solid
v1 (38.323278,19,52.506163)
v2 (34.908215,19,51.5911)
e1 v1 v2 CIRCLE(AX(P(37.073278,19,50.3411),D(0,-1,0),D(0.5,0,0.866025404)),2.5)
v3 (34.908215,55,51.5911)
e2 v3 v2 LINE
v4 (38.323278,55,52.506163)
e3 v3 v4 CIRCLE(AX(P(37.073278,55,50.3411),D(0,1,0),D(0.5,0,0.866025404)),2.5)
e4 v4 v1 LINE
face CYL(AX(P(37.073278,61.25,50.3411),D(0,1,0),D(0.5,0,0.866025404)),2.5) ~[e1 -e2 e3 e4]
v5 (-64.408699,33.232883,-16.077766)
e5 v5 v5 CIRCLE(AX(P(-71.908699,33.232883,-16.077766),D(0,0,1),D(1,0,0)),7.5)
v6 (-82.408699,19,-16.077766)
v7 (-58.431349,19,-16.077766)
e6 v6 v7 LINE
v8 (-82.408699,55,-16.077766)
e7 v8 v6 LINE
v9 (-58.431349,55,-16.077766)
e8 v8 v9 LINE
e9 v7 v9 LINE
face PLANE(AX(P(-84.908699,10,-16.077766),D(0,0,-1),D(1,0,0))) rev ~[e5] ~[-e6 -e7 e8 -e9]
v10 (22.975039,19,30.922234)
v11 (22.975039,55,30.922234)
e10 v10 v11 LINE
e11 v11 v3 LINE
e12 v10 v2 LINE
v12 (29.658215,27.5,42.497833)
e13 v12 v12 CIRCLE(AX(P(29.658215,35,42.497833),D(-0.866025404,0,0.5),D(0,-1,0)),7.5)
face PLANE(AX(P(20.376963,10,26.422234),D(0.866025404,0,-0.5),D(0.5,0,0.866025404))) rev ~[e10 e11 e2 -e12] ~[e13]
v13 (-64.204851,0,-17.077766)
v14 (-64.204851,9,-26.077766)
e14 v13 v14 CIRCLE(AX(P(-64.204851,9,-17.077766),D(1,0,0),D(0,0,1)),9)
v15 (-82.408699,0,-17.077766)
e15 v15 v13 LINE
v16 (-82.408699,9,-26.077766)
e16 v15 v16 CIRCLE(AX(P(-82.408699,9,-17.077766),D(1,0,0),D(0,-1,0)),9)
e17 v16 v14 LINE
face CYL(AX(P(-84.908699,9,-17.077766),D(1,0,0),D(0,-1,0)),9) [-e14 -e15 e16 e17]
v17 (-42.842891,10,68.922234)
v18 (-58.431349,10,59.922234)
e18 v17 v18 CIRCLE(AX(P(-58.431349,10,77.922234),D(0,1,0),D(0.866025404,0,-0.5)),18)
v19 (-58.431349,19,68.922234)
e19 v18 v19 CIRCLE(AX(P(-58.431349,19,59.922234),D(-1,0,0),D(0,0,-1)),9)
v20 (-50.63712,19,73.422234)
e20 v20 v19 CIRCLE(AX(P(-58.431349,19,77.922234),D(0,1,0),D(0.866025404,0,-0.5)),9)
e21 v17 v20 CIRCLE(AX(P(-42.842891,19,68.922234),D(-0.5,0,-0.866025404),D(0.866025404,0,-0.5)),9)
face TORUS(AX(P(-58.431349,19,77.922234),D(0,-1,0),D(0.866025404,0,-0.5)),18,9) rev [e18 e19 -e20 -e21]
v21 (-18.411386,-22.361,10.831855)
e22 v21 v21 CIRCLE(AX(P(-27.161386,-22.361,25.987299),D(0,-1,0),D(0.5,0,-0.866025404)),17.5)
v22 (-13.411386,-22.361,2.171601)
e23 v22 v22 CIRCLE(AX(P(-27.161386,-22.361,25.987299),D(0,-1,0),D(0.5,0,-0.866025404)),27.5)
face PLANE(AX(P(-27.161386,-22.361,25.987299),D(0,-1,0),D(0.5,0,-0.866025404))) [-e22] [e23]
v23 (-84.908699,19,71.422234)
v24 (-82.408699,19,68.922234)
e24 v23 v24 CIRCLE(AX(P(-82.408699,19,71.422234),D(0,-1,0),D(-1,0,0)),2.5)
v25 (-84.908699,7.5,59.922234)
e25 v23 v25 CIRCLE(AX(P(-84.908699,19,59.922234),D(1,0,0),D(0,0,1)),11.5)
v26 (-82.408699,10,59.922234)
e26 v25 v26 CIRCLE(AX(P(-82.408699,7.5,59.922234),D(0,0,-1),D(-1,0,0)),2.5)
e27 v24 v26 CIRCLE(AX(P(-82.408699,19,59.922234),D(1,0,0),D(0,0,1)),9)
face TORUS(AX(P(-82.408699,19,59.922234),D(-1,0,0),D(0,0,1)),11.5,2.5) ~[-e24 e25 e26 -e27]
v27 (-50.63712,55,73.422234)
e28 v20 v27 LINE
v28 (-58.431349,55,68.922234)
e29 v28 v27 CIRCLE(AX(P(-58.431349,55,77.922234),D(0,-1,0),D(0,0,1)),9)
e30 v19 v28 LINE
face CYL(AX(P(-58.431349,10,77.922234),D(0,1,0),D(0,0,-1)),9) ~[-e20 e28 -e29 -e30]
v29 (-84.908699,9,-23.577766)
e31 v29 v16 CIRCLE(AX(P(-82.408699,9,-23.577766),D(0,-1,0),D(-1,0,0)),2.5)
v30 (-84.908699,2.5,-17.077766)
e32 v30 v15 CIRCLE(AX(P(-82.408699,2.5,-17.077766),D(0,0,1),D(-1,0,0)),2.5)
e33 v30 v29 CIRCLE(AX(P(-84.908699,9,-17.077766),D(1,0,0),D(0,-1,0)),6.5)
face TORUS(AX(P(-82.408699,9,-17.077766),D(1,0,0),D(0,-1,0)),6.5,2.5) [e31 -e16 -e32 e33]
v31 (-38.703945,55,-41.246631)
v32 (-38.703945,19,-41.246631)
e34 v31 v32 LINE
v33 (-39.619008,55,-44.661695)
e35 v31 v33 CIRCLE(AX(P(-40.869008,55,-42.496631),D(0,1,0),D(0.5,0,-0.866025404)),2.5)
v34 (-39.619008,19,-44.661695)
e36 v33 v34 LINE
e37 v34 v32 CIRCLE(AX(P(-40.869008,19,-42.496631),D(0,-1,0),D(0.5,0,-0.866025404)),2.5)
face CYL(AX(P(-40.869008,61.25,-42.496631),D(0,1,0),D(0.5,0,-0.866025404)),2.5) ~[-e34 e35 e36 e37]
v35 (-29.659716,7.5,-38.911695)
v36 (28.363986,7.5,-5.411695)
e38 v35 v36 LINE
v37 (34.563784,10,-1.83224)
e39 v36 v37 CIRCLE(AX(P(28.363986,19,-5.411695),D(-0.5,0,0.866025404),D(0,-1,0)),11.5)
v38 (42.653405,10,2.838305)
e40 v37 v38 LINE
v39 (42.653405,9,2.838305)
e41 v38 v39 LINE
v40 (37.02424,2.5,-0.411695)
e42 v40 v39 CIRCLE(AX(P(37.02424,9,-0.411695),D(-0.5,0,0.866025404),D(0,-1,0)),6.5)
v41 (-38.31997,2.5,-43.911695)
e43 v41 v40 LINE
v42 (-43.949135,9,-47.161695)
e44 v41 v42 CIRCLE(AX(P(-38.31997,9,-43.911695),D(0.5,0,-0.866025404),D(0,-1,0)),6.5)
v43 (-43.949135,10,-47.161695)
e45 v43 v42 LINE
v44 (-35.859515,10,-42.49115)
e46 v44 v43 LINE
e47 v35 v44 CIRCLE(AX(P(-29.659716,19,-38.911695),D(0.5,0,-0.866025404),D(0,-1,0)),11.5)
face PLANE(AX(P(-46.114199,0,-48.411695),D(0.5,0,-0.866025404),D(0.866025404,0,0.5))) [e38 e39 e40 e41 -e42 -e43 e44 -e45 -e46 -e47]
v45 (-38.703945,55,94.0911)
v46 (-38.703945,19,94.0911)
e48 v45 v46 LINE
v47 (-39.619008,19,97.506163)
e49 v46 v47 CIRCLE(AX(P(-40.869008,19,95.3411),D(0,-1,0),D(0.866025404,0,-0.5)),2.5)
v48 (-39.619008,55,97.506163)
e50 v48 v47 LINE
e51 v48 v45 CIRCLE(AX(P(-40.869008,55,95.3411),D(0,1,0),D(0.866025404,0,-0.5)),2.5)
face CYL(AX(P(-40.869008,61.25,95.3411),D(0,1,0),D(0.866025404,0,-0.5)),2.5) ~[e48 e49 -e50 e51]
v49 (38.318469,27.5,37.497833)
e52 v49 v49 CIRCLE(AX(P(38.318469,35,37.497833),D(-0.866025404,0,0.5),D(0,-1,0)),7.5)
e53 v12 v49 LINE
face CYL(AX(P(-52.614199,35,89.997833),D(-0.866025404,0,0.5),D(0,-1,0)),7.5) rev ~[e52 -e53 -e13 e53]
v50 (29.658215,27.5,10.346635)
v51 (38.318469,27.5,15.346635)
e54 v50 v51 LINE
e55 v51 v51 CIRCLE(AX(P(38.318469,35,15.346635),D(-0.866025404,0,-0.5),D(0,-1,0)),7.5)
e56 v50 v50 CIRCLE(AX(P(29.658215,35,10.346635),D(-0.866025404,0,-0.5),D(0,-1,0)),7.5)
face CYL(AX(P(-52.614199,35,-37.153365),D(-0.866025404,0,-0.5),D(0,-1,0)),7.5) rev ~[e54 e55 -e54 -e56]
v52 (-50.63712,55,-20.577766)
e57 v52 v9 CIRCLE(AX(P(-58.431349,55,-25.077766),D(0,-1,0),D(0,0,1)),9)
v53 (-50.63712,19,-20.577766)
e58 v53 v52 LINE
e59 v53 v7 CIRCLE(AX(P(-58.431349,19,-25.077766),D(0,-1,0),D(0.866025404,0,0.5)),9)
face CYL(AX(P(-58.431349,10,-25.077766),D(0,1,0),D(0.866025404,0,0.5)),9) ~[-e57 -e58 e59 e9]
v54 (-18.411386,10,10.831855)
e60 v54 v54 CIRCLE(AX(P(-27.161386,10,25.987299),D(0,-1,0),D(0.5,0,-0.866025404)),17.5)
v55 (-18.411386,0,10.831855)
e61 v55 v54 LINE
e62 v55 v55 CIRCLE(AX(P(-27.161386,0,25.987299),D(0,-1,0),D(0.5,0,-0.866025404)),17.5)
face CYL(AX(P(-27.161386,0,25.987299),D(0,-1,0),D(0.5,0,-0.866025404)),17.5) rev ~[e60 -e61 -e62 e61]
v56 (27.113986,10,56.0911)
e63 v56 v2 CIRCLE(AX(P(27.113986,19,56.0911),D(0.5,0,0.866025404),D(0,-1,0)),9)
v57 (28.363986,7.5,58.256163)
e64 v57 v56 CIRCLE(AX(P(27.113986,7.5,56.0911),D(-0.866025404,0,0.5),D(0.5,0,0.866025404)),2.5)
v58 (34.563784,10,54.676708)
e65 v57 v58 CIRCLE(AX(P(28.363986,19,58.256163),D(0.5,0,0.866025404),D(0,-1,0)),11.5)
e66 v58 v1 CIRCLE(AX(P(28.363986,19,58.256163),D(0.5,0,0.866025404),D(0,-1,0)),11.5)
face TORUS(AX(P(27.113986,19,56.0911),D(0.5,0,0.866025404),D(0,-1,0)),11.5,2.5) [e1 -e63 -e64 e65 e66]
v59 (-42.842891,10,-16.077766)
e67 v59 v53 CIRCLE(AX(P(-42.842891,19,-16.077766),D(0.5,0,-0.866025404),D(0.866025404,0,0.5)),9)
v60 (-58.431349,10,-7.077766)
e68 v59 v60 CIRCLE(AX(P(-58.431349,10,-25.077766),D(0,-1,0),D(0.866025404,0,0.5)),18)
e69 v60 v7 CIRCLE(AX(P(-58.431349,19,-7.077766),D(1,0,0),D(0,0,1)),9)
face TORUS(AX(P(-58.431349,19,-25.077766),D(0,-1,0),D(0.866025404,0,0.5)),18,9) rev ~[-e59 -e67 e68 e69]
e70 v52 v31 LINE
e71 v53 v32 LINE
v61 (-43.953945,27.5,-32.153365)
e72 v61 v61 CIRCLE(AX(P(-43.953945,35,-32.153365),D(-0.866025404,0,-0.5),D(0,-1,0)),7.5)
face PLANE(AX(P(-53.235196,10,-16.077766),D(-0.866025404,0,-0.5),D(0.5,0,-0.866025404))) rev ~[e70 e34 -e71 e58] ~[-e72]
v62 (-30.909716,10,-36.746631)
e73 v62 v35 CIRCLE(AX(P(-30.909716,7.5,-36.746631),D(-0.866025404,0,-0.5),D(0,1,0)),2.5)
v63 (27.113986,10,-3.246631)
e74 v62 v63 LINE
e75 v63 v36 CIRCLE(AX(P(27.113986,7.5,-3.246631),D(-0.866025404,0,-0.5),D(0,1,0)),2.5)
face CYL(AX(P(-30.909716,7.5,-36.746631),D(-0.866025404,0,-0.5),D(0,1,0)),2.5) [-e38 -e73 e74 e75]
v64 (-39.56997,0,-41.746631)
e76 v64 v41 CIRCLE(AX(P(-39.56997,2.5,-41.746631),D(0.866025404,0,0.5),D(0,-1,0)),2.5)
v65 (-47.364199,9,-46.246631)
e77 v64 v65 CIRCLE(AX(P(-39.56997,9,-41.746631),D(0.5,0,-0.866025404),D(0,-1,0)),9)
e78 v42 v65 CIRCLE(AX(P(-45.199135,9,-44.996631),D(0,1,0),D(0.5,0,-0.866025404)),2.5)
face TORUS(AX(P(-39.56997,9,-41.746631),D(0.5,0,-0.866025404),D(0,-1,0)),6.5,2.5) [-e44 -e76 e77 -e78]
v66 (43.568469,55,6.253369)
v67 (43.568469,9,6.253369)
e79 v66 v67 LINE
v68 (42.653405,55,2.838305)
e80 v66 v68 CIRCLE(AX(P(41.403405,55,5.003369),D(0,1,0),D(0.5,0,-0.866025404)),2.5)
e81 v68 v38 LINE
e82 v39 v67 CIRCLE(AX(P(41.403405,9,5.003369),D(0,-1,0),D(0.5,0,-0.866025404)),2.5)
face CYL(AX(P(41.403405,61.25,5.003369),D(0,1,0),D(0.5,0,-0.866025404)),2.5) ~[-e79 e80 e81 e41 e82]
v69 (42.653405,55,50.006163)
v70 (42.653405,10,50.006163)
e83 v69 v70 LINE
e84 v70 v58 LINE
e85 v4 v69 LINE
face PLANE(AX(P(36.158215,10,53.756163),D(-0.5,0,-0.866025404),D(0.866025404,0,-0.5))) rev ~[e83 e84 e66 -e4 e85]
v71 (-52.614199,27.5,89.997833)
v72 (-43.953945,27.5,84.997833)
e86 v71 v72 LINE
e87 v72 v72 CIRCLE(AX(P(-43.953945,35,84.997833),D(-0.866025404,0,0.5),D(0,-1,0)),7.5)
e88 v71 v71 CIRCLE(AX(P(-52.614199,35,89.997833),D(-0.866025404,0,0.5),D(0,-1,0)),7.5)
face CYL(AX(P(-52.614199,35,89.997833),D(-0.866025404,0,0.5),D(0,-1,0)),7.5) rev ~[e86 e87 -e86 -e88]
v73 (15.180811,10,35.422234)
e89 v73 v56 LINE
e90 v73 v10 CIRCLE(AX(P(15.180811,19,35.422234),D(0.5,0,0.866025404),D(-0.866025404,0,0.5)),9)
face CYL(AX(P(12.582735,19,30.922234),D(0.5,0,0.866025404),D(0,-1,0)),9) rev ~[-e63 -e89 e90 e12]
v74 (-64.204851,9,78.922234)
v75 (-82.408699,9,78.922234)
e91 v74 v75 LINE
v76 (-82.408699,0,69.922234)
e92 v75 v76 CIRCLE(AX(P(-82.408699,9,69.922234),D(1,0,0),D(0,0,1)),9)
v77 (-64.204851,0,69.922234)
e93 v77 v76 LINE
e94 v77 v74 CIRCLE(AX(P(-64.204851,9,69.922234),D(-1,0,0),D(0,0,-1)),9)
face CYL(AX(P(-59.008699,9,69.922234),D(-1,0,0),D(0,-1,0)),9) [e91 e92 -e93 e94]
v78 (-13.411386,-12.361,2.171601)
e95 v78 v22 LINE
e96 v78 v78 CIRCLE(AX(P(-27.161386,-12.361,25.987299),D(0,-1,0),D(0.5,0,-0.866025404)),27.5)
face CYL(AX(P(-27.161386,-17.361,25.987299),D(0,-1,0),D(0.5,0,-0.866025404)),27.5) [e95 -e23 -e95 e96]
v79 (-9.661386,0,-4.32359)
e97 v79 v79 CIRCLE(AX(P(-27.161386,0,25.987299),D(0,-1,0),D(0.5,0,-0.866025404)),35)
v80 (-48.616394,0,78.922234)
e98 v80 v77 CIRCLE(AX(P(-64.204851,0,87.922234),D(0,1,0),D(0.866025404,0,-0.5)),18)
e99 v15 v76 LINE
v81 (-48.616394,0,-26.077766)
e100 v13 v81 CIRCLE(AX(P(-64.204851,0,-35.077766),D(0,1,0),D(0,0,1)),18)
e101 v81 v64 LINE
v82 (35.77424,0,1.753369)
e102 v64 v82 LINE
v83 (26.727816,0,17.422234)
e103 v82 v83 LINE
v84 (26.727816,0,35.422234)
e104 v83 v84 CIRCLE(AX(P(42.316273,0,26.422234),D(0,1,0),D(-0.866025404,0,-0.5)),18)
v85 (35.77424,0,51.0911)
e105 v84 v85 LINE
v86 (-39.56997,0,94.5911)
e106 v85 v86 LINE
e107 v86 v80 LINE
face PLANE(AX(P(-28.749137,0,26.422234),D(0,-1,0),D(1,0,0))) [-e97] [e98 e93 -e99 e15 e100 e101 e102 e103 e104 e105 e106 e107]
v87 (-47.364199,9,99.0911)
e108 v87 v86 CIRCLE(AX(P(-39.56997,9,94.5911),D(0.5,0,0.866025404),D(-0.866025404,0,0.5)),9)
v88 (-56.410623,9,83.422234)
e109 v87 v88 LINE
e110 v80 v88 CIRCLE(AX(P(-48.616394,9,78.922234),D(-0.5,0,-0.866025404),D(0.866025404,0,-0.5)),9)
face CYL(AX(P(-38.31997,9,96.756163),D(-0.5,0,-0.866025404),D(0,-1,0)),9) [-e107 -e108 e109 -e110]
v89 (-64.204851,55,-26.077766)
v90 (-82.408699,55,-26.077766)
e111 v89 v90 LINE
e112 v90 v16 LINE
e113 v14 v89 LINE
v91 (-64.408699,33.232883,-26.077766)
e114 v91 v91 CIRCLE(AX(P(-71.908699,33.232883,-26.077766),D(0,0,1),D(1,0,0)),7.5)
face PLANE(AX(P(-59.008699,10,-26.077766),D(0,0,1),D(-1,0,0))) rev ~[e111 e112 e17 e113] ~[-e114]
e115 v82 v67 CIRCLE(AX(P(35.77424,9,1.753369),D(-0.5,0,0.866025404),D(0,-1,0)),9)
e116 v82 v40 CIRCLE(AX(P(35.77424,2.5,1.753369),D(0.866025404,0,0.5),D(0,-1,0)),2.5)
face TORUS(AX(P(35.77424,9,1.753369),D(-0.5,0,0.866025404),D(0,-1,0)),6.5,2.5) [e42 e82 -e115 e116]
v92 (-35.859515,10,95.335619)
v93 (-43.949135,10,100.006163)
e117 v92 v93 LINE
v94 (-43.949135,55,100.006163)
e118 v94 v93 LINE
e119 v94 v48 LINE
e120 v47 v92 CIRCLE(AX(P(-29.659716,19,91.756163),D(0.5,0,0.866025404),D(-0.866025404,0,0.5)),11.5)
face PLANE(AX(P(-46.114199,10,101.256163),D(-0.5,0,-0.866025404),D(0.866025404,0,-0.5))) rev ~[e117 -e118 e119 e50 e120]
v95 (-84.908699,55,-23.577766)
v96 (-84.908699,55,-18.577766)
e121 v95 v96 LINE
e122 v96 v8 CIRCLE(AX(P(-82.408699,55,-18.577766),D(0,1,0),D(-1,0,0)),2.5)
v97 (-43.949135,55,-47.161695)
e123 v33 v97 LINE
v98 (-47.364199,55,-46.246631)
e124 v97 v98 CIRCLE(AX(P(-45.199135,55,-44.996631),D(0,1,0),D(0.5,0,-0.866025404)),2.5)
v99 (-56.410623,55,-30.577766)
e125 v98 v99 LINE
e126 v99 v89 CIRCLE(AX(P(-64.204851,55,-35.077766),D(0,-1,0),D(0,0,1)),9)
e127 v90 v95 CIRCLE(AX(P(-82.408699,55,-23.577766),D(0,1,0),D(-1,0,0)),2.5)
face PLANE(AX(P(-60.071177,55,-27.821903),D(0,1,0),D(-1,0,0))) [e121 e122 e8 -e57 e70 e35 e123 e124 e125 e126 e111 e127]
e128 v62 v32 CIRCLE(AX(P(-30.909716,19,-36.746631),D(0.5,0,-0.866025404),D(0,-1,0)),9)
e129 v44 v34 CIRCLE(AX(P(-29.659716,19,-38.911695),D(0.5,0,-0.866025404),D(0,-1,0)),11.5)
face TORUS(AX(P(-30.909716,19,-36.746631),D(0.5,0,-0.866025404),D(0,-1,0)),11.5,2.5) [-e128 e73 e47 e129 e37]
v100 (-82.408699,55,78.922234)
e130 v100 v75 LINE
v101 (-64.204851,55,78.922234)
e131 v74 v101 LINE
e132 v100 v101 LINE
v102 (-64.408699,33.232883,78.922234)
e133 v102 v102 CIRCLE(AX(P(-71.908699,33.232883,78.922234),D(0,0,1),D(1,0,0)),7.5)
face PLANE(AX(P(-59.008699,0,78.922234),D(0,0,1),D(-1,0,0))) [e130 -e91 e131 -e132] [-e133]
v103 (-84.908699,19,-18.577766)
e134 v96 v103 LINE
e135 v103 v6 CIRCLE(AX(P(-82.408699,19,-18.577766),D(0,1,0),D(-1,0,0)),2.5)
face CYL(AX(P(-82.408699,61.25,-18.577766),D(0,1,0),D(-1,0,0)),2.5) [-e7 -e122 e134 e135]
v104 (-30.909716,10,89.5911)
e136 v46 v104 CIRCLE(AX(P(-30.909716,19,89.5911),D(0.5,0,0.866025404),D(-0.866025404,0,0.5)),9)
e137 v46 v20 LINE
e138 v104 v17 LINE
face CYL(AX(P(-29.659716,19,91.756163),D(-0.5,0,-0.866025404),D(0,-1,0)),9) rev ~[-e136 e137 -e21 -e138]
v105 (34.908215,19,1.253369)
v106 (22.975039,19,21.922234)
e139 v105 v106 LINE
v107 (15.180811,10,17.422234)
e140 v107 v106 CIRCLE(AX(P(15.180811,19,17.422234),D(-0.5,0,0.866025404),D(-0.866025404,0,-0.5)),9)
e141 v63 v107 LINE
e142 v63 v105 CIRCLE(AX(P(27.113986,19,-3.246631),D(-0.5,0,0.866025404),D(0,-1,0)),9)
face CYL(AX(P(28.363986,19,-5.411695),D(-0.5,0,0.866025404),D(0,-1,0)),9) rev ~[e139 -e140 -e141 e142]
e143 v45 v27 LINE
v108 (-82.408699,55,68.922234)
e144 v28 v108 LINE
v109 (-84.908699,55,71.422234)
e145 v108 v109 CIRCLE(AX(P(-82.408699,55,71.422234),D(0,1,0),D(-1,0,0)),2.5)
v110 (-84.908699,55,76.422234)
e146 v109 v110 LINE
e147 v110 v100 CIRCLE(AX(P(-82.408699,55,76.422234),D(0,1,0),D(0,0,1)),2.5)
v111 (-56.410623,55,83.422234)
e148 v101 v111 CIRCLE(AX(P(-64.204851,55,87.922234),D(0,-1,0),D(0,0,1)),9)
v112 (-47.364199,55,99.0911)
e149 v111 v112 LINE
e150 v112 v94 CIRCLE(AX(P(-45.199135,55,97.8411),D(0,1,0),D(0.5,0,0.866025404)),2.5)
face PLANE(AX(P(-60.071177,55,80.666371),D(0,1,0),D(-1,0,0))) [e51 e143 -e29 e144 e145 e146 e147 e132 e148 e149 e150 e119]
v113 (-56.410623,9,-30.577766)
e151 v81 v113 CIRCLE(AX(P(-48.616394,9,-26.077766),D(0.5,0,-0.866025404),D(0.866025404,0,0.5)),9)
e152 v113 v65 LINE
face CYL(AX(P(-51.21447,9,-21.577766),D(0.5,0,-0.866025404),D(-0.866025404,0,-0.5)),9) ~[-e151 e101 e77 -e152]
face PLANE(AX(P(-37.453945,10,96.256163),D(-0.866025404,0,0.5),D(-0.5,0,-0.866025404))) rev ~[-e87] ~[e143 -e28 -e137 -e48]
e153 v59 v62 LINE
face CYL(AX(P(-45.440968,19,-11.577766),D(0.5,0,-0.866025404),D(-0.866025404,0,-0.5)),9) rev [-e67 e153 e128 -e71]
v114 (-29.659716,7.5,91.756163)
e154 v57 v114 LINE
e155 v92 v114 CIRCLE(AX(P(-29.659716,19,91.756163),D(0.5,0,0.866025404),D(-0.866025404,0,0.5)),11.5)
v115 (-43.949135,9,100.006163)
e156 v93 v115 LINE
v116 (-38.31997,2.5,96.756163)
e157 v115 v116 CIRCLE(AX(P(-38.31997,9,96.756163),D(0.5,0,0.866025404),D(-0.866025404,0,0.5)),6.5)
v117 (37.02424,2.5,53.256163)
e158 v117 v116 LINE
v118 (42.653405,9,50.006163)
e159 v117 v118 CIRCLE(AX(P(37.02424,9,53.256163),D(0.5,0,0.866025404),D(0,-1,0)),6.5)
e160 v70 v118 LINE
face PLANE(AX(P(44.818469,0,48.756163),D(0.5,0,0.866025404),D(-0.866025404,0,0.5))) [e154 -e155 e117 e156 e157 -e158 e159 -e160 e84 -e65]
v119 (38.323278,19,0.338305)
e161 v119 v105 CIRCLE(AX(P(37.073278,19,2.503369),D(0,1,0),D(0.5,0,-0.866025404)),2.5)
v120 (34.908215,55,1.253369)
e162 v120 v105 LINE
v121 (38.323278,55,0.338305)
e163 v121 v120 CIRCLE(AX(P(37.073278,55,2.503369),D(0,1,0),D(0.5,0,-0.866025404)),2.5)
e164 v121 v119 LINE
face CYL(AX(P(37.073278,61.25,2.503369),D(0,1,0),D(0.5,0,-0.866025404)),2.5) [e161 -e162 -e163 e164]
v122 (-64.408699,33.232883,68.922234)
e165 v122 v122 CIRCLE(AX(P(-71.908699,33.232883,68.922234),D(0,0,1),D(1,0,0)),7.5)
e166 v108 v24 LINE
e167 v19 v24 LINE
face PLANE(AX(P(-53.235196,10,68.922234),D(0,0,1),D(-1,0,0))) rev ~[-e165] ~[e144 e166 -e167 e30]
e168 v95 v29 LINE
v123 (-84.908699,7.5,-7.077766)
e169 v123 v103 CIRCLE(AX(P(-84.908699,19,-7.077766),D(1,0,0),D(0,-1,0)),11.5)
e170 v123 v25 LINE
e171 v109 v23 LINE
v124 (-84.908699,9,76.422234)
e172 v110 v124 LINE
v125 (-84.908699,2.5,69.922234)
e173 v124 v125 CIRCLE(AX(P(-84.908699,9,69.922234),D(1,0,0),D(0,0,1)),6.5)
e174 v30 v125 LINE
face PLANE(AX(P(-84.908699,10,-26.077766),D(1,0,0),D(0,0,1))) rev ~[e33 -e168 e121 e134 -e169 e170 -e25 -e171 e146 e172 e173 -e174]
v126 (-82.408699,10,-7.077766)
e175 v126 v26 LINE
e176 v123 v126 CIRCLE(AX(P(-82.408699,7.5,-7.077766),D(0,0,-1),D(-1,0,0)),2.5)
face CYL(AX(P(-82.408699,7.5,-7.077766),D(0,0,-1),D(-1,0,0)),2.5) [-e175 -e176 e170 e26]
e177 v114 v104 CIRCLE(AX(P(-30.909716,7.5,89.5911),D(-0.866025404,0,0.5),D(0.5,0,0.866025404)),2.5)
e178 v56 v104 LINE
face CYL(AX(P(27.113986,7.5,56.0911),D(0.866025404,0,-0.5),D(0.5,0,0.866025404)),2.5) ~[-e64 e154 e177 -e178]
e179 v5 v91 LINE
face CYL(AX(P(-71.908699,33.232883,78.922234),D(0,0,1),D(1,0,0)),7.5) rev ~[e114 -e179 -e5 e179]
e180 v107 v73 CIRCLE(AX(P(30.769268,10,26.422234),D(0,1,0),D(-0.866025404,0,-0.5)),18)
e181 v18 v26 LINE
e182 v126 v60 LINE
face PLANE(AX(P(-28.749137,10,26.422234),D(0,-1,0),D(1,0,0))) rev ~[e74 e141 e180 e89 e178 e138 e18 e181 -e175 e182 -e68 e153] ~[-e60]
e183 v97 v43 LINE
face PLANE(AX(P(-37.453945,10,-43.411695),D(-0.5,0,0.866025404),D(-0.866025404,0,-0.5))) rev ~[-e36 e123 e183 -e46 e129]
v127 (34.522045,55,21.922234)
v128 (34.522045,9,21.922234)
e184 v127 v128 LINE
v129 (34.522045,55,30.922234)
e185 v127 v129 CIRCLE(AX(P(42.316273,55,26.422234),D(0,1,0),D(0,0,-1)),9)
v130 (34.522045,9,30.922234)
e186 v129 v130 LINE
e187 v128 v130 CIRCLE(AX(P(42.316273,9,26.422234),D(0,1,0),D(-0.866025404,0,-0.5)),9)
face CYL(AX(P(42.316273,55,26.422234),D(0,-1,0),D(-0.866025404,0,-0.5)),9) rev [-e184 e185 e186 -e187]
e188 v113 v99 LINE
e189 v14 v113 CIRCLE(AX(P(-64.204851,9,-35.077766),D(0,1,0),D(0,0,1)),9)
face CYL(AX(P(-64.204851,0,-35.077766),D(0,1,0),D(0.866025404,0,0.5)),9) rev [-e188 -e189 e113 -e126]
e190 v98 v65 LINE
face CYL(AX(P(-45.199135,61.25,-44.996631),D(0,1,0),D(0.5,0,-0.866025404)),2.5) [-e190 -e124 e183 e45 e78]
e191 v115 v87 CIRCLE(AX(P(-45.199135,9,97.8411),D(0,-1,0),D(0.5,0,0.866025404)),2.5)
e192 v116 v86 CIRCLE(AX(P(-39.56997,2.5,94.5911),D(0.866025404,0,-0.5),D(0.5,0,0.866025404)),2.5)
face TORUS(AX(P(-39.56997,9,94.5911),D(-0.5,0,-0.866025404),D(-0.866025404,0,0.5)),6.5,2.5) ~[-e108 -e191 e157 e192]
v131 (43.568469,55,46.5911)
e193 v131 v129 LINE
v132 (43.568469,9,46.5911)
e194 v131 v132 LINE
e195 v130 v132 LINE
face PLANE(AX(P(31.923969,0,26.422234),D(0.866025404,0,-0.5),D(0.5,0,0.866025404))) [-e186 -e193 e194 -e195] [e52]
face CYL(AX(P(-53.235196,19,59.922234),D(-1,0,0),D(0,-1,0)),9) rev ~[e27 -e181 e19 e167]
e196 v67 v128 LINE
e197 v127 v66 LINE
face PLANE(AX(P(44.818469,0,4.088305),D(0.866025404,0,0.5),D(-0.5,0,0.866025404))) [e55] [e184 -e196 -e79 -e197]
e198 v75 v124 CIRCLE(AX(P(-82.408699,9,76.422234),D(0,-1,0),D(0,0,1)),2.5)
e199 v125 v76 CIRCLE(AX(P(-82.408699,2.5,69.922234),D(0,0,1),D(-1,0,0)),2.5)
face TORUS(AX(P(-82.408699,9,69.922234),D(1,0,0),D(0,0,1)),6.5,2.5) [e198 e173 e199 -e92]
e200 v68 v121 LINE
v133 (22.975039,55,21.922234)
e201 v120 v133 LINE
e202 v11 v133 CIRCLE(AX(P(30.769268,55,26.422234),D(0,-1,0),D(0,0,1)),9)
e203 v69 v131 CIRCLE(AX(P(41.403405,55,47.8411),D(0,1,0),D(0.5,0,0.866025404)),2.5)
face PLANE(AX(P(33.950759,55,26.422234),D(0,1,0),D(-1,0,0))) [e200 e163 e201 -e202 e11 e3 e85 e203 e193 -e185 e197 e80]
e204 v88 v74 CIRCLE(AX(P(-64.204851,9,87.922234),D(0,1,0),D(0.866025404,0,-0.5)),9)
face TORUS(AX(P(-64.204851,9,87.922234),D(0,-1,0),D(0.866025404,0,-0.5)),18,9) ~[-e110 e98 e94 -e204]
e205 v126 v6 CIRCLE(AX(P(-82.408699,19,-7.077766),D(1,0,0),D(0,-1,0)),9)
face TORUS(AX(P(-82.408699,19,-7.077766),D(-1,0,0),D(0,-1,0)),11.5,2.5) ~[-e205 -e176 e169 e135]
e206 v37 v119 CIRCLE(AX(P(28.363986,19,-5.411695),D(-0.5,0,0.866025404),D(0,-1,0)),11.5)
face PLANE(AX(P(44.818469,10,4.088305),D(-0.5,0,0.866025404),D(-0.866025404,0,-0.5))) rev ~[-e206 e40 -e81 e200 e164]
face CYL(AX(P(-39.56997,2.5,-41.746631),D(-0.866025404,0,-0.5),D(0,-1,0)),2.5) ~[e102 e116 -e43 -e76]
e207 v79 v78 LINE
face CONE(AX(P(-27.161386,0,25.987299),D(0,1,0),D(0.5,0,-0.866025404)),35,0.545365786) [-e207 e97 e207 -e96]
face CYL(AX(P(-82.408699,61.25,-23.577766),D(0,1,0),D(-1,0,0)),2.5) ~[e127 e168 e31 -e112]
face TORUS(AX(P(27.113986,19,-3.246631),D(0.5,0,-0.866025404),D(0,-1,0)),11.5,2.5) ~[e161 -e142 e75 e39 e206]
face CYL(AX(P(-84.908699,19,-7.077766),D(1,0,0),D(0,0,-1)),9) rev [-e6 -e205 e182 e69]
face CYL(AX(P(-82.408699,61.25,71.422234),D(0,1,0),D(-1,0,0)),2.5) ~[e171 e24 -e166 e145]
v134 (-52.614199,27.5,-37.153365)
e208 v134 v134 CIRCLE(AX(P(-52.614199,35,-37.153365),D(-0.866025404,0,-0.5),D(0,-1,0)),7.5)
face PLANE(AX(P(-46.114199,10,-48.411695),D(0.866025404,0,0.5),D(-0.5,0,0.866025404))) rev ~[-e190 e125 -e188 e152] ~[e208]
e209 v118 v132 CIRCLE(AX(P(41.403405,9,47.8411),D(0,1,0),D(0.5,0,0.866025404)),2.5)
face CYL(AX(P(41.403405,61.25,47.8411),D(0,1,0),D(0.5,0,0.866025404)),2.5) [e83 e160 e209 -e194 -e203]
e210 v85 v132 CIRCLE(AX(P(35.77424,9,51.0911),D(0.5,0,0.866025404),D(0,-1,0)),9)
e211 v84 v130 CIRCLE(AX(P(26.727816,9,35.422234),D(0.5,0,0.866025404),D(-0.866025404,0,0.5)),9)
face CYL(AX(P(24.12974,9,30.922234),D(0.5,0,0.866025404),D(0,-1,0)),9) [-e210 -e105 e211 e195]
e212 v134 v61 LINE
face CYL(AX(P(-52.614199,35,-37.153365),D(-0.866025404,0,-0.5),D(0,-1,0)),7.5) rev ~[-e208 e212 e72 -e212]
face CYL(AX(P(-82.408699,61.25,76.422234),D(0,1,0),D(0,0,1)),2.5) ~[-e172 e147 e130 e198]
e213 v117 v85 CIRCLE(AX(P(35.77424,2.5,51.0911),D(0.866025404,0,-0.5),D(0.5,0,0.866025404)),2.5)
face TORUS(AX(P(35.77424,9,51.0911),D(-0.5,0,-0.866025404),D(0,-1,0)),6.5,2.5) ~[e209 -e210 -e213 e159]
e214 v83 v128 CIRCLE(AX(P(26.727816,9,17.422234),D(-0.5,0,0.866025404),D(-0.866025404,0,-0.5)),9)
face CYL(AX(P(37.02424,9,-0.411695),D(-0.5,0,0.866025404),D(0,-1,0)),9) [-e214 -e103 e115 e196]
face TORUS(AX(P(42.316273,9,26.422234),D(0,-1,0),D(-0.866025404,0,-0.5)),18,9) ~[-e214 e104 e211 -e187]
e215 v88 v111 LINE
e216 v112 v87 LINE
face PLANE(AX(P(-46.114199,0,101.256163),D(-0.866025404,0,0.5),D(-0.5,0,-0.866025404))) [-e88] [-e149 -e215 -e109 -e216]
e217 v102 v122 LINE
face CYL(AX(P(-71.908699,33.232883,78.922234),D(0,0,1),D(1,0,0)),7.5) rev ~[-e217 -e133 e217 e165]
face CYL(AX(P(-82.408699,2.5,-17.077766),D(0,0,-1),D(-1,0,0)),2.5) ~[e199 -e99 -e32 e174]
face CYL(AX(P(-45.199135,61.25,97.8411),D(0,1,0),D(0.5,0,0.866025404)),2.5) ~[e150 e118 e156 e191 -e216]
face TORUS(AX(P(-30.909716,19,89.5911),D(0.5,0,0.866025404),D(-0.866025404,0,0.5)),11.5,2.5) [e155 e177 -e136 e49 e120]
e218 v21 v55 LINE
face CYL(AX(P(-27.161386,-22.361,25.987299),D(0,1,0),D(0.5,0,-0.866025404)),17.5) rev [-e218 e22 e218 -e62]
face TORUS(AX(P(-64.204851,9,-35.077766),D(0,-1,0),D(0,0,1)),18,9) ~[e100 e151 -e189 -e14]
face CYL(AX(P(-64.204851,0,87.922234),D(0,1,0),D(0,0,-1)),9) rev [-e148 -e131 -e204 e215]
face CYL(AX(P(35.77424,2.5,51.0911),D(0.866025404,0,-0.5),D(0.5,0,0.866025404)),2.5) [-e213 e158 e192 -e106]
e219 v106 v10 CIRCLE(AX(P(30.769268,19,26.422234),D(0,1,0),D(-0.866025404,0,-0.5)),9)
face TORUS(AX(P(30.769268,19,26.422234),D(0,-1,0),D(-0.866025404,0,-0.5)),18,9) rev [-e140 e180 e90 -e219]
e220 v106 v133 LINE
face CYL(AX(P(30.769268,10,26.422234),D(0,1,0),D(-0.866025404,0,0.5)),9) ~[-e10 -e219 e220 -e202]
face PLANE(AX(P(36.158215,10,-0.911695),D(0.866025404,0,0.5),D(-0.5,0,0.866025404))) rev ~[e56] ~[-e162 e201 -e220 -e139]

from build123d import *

# Parameters (mm, degrees)
F1_DEPTH      = 10
F6_DEPTH      = 45
F4_W          = 10
F4_H          = 10
F8_R          = 7.5
F11_DEPTH     = 150
F10_R         = 7.5
F12_DEPTH     = 120
F9_R          = 7.5
F13_DEPTH     = 120
F14_R         = 9
F15_T1_DEPTH  = 87
F15_T3_DEPTH  = 67
F15_T5_DEPTH  = 42.25
F15_T7_DEPTH  = 52.25
F15_T9_DEPTH  = 67
F15_T11_DEPTH = 87
F15_T13_DEPTH = 87
F15_T15_DEPTH = 67
F15_T18_ANGLE = 90
F15_T20_ANGLE = 90
F15_T22_ANGLE = 90
F15_T24_ANGLE = 90
F15_T26_ANGLE = 90
F15_T28_ANGLE = 90
F15_T30_ANGLE = 90
F15_T32_ANGLE = 90
F15_T34_ANGLE = 90
F15_T36_ANGLE = 90
F15_T38_ANGLE = 90
F15_T40_ANGLE = 90
F16_DEPTH     = 25


# Not quite as in the source:
# - a fillet or chamfer that OpenCascade refuses, or shapes differently, is made with other operations: its cross-section is extruded or revolved along the edge and cut away or added


with BuildPart() as f1:
    # F0 (on Front) → F1 (new body)
    with BuildSketch(Plane.XZ):
        Polygon((-59.0086988402, 78.9222342521), (-84.9086988402, 78.9222342521), (-84.9086988402, -26.0777657479), (-59.0086988402, -26.0777657479), (-46.1141988402, -48.4116948861), (44.8184685572, 4.0883051139), (31.9239685572, 26.4222342521), (44.8184685572, 48.7561633903), (-46.1141988402, 101.2561633903), align=None)
    extrude(amount=-F1_DEPTH)

    # F5 (on face) → F6 (join)
    with BuildSketch(Plane(origin=(0, 10, 0), x_dir=(-1, 0, 0), z_dir=(0, 1, 0))):
        Polygon((37.4539448024, -43.4116948861), (46.1141988402, -48.4116948861), (59.0086988402, -26.0777657479), (84.9086988402, -26.0777657479), (84.9086988402, -16.0777657479), (53.2351961483, -16.0777657479), align=None)
        Polygon((-44.8184685572, 4.0883051139), (-36.1582145193, -0.9116948861), (-20.3769631734, 26.4222342521), (-36.1582145193, 53.7561633903), (-44.8184685572, 48.7561633903), (-31.9239685572, 26.4222342521), align=None)
        Polygon((53.2351961483, 68.9222342521), (84.9086988402, 68.9222342521), (84.9086988402, 78.9222342521), (59.0086988402, 78.9222342521), (46.1141988402, 101.2561633903), (37.4539448024, 96.2561633903), align=None)
    extrude(amount=F6_DEPTH)

    # F4 (on line) → F7 (revolve)
    with BuildSketch(Plane(origin=(-9.1182087742, 0, -5.2644002903), x_dir=(0, -1, 0), z_dir=(-0.8660254038, 0, -0.5))):
        with Locations((17.361, 13.5863541796)):
            Rectangle(F4_W, F4_H)
        Polygon((12.361, 8.5863541796), (12.361, 18.5863541796), (0, 18.5863541796), (0, 1.0863541796), align=None)
    revolve(axis=Axis((-27.161385864, -39.4499748945, 25.9872991592), (0, -1, 0)))

    # F8 (on face) → F11 (cut)
    with BuildSketch(Plane(origin=(-78.430854023, 0, 45.282074683), x_dir=(0, -1, 0), z_dir=(-0.8660254038, 0, 0.5))):
        with Locations((-35, 51.6333103656)):
            Circle(F8_R)
    extrude(amount=-F11_DEPTH, mode=Mode.SUBTRACT)

    # F10 (on face) → F12 (cut)
    with BuildSketch(Plane(origin=(-55.548527936, 0, -32.0709575569), x_dir=(0, -1, 0), z_dir=(-0.8660254038, 0, -0.5))):
        with Locations((-35, -5.8686581915)):
            Circle(F10_R)
    extrude(amount=-F12_DEPTH, mode=Mode.SUBTRACT)

    # F9 (on face) → F13 (cut)
    with BuildSketch(Plane.XY.offset(78.9222342521)):
        with Locations((-71.9086988402, 33.2328826189)):
            Circle(F9_R)
    extrude(amount=-F13_DEPTH, mode=Mode.SUBTRACT)

    # F14
    f14_edges = [f1.edges().sort_by_distance(p)[0] for p in [
        (-71.958699, 0, -26.077766),
        (-52.561449, 0, -37.24473),
        (-59.008699, 27.5, -26.077766),
        (-52.561449, 0, 90.089199),
        (-71.958699, 0, 78.922234),
        (-59.008699, 27.5, 78.922234),
        (38.371219, 0, 15.25527),
        (38.371219, 0, 37.589199),
        (31.923969, 27.5, 26.422234),
        (-45.34457, 10, 82.589199),
        (-69.071947, 10, 68.922234),
        (-53.235196, 32.5, 68.922234),
        (-45.34457, 10, -29.74473),
        (-69.071947, 10, -16.077766),
        (-53.235196, 32.5, -16.077766),
        (20.376963, 32.5, 26.422234),
        (28.267589, 10, 12.75527),
        (28.267589, 10, 40.089199),
    ]]
    fillet(f14_edges, radius=F14_R)

    # F15: fillet of radius 2.5 on 30 edges, made by hand

    # F15_s2 → F15_t1 (cut)
    with BuildSketch(Plane.XY.offset(-17.0777657479)):
        with BuildLine():
            ThreePointArc((-84.9086988402, 2.5), (-84.1764657932, 0.732233047), (-82.4086988402, 0))
            Line((-82.4086988402, 0), (-84.9086988402, 0))
            Line((-84.9086988402, 0), (-84.9086988402, 2.5))
        make_face()
    extrude(amount=F15_T1_DEPTH, mode=Mode.SUBTRACT)

    # F15_s4 → F15_t3 (cut)
    with BuildSketch(Plane.XY.offset(-7.0777657479)):
        with BuildLine():
            ThreePointArc((-84.9086988402, 7.5), (-84.1764657932, 9.267766953), (-82.4086988402, 10))
            Line((-82.4086988402, 10), (-84.9086988402, 10))
            Line((-84.9086988402, 10), (-84.9086988402, 7.5))
        make_face()
    extrude(amount=F15_T3_DEPTH, mode=Mode.SUBTRACT)

    # F15_s6 → F15_t5 (cut)
    with BuildSketch(Plane.XZ.offset(-61.25)):
        with BuildLine():
            ThreePointArc((-84.9086988402, 71.4222342521), (-84.1764657932, 69.6544672991), (-82.4086988402, 68.9222342521))
            Line((-82.4086988402, 68.9222342521), (-84.9086988402, 68.9222342521))
            Line((-84.9086988402, 68.9222342521), (-84.9086988402, 71.4222342521))
        make_face()
        with BuildLine():
            ThreePointArc((-84.9086988402, -18.5777657479), (-84.1764657932, -16.8099987949), (-82.4086988402, -16.0777657479))
            Line((-82.4086988402, -16.0777657479), (-84.9086988402, -16.0777657479))
            Line((-84.9086988402, -16.0777657479), (-84.9086988402, -18.5777657479))
        make_face()
        with BuildLine():
            ThreePointArc((-38.7039448024, 94.0910998808), (-38.4541937461, 95.9881474936), (-39.6190083118, 97.5061633903))
            Line((-39.6190083118, 97.5061633903), (-37.4539448024, 96.2561633903))
            Line((-37.4539448024, 96.2561633903), (-38.7039448024, 94.0910998808))
        make_face()
        with BuildLine():
            ThreePointArc((38.3232780288, 52.5061633903), (36.426230416, 52.7559144466), (34.9082145193, 51.5910998808))
            Line((34.9082145193, 51.5910998808), (36.1582145193, 53.7561633903))
            Line((36.1582145193, 53.7561633903), (38.3232780288, 52.5061633903))
        make_face()
        with BuildLine():
            ThreePointArc((38.3232780288, 0.3383051139), (36.426230416, 0.0885540576), (34.9082145193, 1.2533686234))
            Line((34.9082145193, 1.2533686234), (36.1582145193, -0.9116948861))
            Line((36.1582145193, -0.9116948861), (38.3232780288, 0.3383051139))
        make_face()
        with BuildLine():
            ThreePointArc((-39.6190083118, -44.6616948861), (-38.4541937461, -43.1436789894), (-38.7039448024, -41.2466313766))
            Line((-38.7039448024, -41.2466313766), (-37.4539448024, -43.4116948861))
            Line((-37.4539448024, -43.4116948861), (-39.6190083118, -44.6616948861))
        make_face()
    extrude(amount=F15_T5_DEPTH, mode=Mode.SUBTRACT)

    # F15_s8 → F15_t7 (cut)
    with BuildSketch(Plane.XZ.offset(-61.25)):
        with BuildLine():
            ThreePointArc((-43.9491353307, 100.0061633903), (-45.8461829435, 100.2559144466), (-47.3641988402, 99.0910998808))
            Line((-47.3641988402, 99.0910998808), (-46.1141988402, 101.2561633903))
            Line((-46.1141988402, 101.2561633903), (-43.9491353307, 100.0061633903))
        make_face()
        with BuildLine():
            ThreePointArc((42.6534050477, 2.8383051139), (43.8182196134, 4.3563210106), (43.5684685572, 6.2533686234))
            Line((43.5684685572, 6.2533686234), (44.8184685572, 4.0883051139))
            Line((44.8184685572, 4.0883051139), (42.6534050477, 2.8383051139))
        make_face()
        with BuildLine():
            ThreePointArc((-82.4086988402, 78.9222342521), (-84.1764657932, 78.1900012051), (-84.9086988402, 76.4222342521))
            Line((-84.9086988402, 76.4222342521), (-84.9086988402, 78.9222342521))
            Line((-84.9086988402, 78.9222342521), (-82.4086988402, 78.9222342521))
        make_face()
        with BuildLine():
            ThreePointArc((-84.9086988402, -23.5777657479), (-84.1764657932, -25.3455327009), (-82.4086988402, -26.0777657479))
            Line((-82.4086988402, -26.0777657479), (-84.9086988402, -26.0777657479))
            Line((-84.9086988402, -26.0777657479), (-84.9086988402, -23.5777657479))
        make_face()
        with BuildLine():
            ThreePointArc((42.6534050477, 50.0061633903), (43.8182196134, 48.4881474936), (43.5684685572, 46.5910998808))
            Line((43.5684685572, 46.5910998808), (44.8184685572, 48.7561633903))
            Line((44.8184685572, 48.7561633903), (42.6534050477, 50.0061633903))
        make_face()
        with BuildLine():
            ThreePointArc((-43.9491353307, -47.1616948861), (-45.8461829435, -47.4114459424), (-47.3641988402, -46.2466313766))
            Line((-47.3641988402, -46.2466313766), (-46.1141988402, -48.4116948861))
            Line((-46.1141988402, -48.4116948861), (-43.9491353307, -47.1616948861))
        make_face()
    extrude(amount=F15_T7_DEPTH, mode=Mode.SUBTRACT)

    # F15_s10 → F15_t9 (cut)
    with BuildSketch(Plane(origin=(-3.9526692976, 0, 2.282074683), x_dir=(0, 1, 0), z_dir=(-0.8660254038, 0, 0.5))):
        with BuildLine():
            ThreePointArc((7.5, -64.6333103656), (9.267766953, -63.9010773186), (10, -62.1333103656))
            Line((10, -62.1333103656), (10, -64.6333103656))
            Line((10, -64.6333103656), (7.5, -64.6333103656))
        make_face()
    extrude(amount=F15_T9_DEPTH, mode=Mode.SUBTRACT)

    # F15_s12 → F15_t11 (cut)
    with BuildSketch(Plane(origin=(4.7075847403, 0, -2.717925317), x_dir=(0, 1, 0), z_dir=(-0.8660254038, 0, 0.5))):
        with BuildLine():
            ThreePointArc((2.5, -64.6333103656), (0.732233047, -63.9010773186), (0, -62.1333103656))
            Line((0, -62.1333103656), (0, -64.6333103656))
            Line((0, -64.6333103656), (2.5, -64.6333103656))
        make_face()
    extrude(amount=F15_T11_DEPTH, mode=Mode.SUBTRACT)

    # F15_s14 → F15_t13 (cut)
    with BuildSketch(Plane(origin=(-47.7542993019, 0, -27.5709575569), x_dir=(0, 1, 0), z_dir=(0.8660254038, 0, 0.5))):
        with BuildLine():
            ThreePointArc((0, -16.3686581915), (0.732233047, -18.1364251445), (2.5, -18.8686581915))
            Line((2.5, -18.8686581915), (0, -18.8686581915))
            Line((0, -18.8686581915), (0, -16.3686581915))
        make_face()
    extrude(amount=F15_T13_DEPTH, mode=Mode.SUBTRACT)

    # F15_s16 → F15_t15 (cut)
    with BuildSketch(Plane(origin=(-39.0940452641, 0, -22.5709575569), x_dir=(0, 1, 0), z_dir=(0.8660254038, 0, 0.5))):
        with BuildLine():
            ThreePointArc((10, -16.3686581915), (9.267766953, -18.1364251445), (7.5, -18.8686581915))
            Line((7.5, -18.8686581915), (10, -18.8686581915))
            Line((10, -18.8686581915), (10, -16.3686581915))
        make_face()
    extrude(amount=F15_T15_DEPTH, mode=Mode.SUBTRACT)

    # F15_s17 → F15_t18 (revolve, cut)
    with BuildSketch(Plane.XZ.offset(-9)):
        with BuildLine():
            ThreePointArc((-84.9086988402, 76.4222342521), (-84.1764657932, 78.1900012051), (-82.4086988402, 78.9222342521))
            Line((-82.4086988402, 78.9222342521), (-84.9086988402, 78.9222342521))
            Line((-84.9086988402, 78.9222342521), (-84.9086988402, 76.4222342521))
        make_face()
    revolve(axis=Axis((-84.9086988402, 9, 69.9222342521), (1, 0, 0)), revolution_arc=F15_T18_ANGLE, mode=Mode.SUBTRACT)

    # F15_s19 → F15_t20 (revolve, cut)
    with BuildSketch(Plane.XY.offset(-17.0777657479)):
        with BuildLine():
            ThreePointArc((-84.9086988402, 2.5), (-84.1764657932, 0.732233047), (-82.4086988402, 0))
            Line((-82.4086988402, 0), (-84.9086988402, 0))
            Line((-84.9086988402, 0), (-84.9086988402, 2.5))
        make_face()
    revolve(axis=Axis((-84.9086988402, 9, -17.0777657479), (1, 0, 0)), revolution_arc=F15_T20_ANGLE, mode=Mode.SUBTRACT)

    # F15_s21 → F15_t22 (revolve, cut)
    with BuildSketch(Plane.XZ.offset(-19)):
        with BuildLine():
            ThreePointArc((-84.9086988402, 71.4222342521), (-84.1764657932, 69.6544672991), (-82.4086988402, 68.9222342521))
            Line((-82.4086988402, 68.9222342521), (-84.9086988402, 68.9222342521))
            Line((-84.9086988402, 68.9222342521), (-84.9086988402, 71.4222342521))
        make_face()
    revolve(axis=Axis((-84.9086988402, 19, 59.9222342521), (1, 0, 0)), revolution_arc=F15_T22_ANGLE, mode=Mode.SUBTRACT)

    # F15_s23 → F15_t24 (revolve, cut)
    with BuildSketch(Plane.XY.offset(-7.0777657479)):
        with BuildLine():
            ThreePointArc((-84.9086988402, 7.5), (-84.1764657932, 9.267766953), (-82.4086988402, 10))
            Line((-82.4086988402, 10), (-84.9086988402, 10))
            Line((-84.9086988402, 10), (-84.9086988402, 7.5))
        make_face()
    revolve(axis=Axis((-84.9086988402, 19, -7.0777657479), (1, 0, 0)), revolution_arc=F15_T24_ANGLE, mode=Mode.SUBTRACT)

    # F15_s25 → F15_t26 (revolve, cut)
    with BuildSketch(Plane(origin=(4.7075847403, 0, -2.717925317), x_dir=(0, 1, 0), z_dir=(-0.8660254038, 0, 0.5))):
        with BuildLine():
            ThreePointArc((2.5, -64.6333103656), (0.732233047, -63.9010773186), (0, -62.1333103656))
            Line((0, -62.1333103656), (0, -64.6333103656))
            Line((0, -64.6333103656), (2.5, -64.6333103656))
        make_face()
    revolve(axis=Axis((37.0242399231, 9, 53.2561633903), (0.5, 0, 0.8660254038)), revolution_arc=F15_T26_ANGLE, mode=Mode.SUBTRACT)

    # F15_s27 → F15_t28 (revolve, cut)
    with BuildSketch(Plane.XZ.offset(-9)):
        with BuildLine():
            ThreePointArc((-43.9491353307, 100.0061633903), (-45.8461829435, 100.2559144466), (-47.3641988402, 99.0910998808))
            Line((-47.3641988402, 99.0910998808), (-46.1141988402, 101.2561633903))
            Line((-46.1141988402, 101.2561633903), (-43.9491353307, 100.0061633903))
        make_face()
    revolve(axis=Axis((-38.3199702061, 9, 96.7561633903), (0.5, 0, 0.8660254038)), revolution_arc=F15_T28_ANGLE, mode=Mode.SUBTRACT)

    # F15_s29 → F15_t30 (revolve, cut)
    with BuildSketch(Plane(origin=(-3.9526692976, 0, 2.282074683), x_dir=(0, 1, 0), z_dir=(-0.8660254038, 0, 0.5))):
        with BuildLine():
            ThreePointArc((7.5, -64.6333103656), (9.267766953, -63.9010773186), (10, -62.1333103656))
            Line((10, -62.1333103656), (10, -64.6333103656))
            Line((10, -64.6333103656), (7.5, -64.6333103656))
        make_face()
    revolve(axis=Axis((28.3639858853, 19, 58.2561633903), (0.5, 0, 0.8660254038)), revolution_arc=F15_T30_ANGLE, mode=Mode.SUBTRACT)

    # F15_s31 → F15_t32 (revolve, cut)
    with BuildSketch(Plane.XZ.offset(-19)):
        with BuildLine():
            ThreePointArc((-39.6190083118, 97.5061633903), (-38.4541937461, 95.9881474936), (-38.7039448024, 94.0910998808))
            Line((-38.7039448024, 94.0910998808), (-37.4539448024, 96.2561633903))
            Line((-37.4539448024, 96.2561633903), (-39.6190083118, 97.5061633903))
        make_face()
    revolve(axis=Axis((-29.6597161683, 19, 91.7561633903), (0.5, 0, 0.8660254038)), revolution_arc=F15_T32_ANGLE, mode=Mode.SUBTRACT)

    # F15_s33 → F15_t34 (revolve, cut)
    with BuildSketch(Plane(origin=(-47.7542993019, 0, -27.5709575569), x_dir=(0, 1, 0), z_dir=(0.8660254038, 0, 0.5))):
        with BuildLine():
            ThreePointArc((0, -16.3686581915), (0.732233047, -18.1364251445), (2.5, -18.8686581915))
            Line((2.5, -18.8686581915), (0, -18.8686581915))
            Line((0, -18.8686581915), (0, -16.3686581915))
        make_face()
    revolve(axis=Axis((-38.3199702061, 9, -43.9116948861), (0.5, 0, -0.8660254038)), revolution_arc=F15_T34_ANGLE, mode=Mode.SUBTRACT)

    # F15_s35 → F15_t36 (revolve, cut)
    with BuildSketch(Plane(origin=(27.5899108273, 0, 15.9290424431), x_dir=(0, 1, 0), z_dir=(-0.8660254038, 0, -0.5))):
        with BuildLine():
            ThreePointArc((2.5, 18.8686581915), (0.732233047, 18.1364251445), (0, 16.3686581915))
            Line((0, 16.3686581915), (0, 18.8686581915))
            Line((0, 18.8686581915), (2.5, 18.8686581915))
        make_face()
    revolve(axis=Axis((37.0242399231, 9, -0.4116948861), (-0.5, 0, 0.8660254038)), revolution_arc=F15_T36_ANGLE, mode=Mode.SUBTRACT)

    # F15_s37 → F15_t38 (revolve, cut)
    with BuildSketch(Plane(origin=(-39.0940452641, 0, -22.5709575569), x_dir=(0, 1, 0), z_dir=(0.8660254038, 0, 0.5))):
        with BuildLine():
            ThreePointArc((7.5, -18.8686581915), (9.267766953, -18.1364251445), (10, -16.3686581915))
            Line((10, -16.3686581915), (10, -18.8686581915))
            Line((10, -18.8686581915), (7.5, -18.8686581915))
        make_face()
    revolve(axis=Axis((-29.6597161683, 19, -38.9116948861), (0.5, 0, -0.8660254038)), revolution_arc=F15_T38_ANGLE, mode=Mode.SUBTRACT)

    # F15_s39 → F15_t40 (revolve, cut)
    with BuildSketch(Plane(origin=(18.9296567895, 0, 10.9290424431), x_dir=(0, 1, 0), z_dir=(-0.8660254038, 0, -0.5))):
        with BuildLine():
            ThreePointArc((7.5, 18.8686581915), (9.267766953, 18.1364251445), (10, 16.3686581915))
            Line((10, 16.3686581915), (10, 18.8686581915))
            Line((10, 18.8686581915), (7.5, 18.8686581915))
        make_face()
    revolve(axis=Axis((28.3639858853, 19, -5.4116948861), (-0.5, 0, 0.8660254038)), revolution_arc=F15_T40_ANGLE, mode=Mode.SUBTRACT)

    # F16 (cut): a face of the model
    f16_faces = [f1.faces().sort_by_distance(p)[0] for p in [
        (-27.161385864, 0, 25.9872991592),
    ]]
    extrude(f16_faces, amount=-F16_DEPTH, mode=Mode.SUBTRACT)


solid = f1.part
